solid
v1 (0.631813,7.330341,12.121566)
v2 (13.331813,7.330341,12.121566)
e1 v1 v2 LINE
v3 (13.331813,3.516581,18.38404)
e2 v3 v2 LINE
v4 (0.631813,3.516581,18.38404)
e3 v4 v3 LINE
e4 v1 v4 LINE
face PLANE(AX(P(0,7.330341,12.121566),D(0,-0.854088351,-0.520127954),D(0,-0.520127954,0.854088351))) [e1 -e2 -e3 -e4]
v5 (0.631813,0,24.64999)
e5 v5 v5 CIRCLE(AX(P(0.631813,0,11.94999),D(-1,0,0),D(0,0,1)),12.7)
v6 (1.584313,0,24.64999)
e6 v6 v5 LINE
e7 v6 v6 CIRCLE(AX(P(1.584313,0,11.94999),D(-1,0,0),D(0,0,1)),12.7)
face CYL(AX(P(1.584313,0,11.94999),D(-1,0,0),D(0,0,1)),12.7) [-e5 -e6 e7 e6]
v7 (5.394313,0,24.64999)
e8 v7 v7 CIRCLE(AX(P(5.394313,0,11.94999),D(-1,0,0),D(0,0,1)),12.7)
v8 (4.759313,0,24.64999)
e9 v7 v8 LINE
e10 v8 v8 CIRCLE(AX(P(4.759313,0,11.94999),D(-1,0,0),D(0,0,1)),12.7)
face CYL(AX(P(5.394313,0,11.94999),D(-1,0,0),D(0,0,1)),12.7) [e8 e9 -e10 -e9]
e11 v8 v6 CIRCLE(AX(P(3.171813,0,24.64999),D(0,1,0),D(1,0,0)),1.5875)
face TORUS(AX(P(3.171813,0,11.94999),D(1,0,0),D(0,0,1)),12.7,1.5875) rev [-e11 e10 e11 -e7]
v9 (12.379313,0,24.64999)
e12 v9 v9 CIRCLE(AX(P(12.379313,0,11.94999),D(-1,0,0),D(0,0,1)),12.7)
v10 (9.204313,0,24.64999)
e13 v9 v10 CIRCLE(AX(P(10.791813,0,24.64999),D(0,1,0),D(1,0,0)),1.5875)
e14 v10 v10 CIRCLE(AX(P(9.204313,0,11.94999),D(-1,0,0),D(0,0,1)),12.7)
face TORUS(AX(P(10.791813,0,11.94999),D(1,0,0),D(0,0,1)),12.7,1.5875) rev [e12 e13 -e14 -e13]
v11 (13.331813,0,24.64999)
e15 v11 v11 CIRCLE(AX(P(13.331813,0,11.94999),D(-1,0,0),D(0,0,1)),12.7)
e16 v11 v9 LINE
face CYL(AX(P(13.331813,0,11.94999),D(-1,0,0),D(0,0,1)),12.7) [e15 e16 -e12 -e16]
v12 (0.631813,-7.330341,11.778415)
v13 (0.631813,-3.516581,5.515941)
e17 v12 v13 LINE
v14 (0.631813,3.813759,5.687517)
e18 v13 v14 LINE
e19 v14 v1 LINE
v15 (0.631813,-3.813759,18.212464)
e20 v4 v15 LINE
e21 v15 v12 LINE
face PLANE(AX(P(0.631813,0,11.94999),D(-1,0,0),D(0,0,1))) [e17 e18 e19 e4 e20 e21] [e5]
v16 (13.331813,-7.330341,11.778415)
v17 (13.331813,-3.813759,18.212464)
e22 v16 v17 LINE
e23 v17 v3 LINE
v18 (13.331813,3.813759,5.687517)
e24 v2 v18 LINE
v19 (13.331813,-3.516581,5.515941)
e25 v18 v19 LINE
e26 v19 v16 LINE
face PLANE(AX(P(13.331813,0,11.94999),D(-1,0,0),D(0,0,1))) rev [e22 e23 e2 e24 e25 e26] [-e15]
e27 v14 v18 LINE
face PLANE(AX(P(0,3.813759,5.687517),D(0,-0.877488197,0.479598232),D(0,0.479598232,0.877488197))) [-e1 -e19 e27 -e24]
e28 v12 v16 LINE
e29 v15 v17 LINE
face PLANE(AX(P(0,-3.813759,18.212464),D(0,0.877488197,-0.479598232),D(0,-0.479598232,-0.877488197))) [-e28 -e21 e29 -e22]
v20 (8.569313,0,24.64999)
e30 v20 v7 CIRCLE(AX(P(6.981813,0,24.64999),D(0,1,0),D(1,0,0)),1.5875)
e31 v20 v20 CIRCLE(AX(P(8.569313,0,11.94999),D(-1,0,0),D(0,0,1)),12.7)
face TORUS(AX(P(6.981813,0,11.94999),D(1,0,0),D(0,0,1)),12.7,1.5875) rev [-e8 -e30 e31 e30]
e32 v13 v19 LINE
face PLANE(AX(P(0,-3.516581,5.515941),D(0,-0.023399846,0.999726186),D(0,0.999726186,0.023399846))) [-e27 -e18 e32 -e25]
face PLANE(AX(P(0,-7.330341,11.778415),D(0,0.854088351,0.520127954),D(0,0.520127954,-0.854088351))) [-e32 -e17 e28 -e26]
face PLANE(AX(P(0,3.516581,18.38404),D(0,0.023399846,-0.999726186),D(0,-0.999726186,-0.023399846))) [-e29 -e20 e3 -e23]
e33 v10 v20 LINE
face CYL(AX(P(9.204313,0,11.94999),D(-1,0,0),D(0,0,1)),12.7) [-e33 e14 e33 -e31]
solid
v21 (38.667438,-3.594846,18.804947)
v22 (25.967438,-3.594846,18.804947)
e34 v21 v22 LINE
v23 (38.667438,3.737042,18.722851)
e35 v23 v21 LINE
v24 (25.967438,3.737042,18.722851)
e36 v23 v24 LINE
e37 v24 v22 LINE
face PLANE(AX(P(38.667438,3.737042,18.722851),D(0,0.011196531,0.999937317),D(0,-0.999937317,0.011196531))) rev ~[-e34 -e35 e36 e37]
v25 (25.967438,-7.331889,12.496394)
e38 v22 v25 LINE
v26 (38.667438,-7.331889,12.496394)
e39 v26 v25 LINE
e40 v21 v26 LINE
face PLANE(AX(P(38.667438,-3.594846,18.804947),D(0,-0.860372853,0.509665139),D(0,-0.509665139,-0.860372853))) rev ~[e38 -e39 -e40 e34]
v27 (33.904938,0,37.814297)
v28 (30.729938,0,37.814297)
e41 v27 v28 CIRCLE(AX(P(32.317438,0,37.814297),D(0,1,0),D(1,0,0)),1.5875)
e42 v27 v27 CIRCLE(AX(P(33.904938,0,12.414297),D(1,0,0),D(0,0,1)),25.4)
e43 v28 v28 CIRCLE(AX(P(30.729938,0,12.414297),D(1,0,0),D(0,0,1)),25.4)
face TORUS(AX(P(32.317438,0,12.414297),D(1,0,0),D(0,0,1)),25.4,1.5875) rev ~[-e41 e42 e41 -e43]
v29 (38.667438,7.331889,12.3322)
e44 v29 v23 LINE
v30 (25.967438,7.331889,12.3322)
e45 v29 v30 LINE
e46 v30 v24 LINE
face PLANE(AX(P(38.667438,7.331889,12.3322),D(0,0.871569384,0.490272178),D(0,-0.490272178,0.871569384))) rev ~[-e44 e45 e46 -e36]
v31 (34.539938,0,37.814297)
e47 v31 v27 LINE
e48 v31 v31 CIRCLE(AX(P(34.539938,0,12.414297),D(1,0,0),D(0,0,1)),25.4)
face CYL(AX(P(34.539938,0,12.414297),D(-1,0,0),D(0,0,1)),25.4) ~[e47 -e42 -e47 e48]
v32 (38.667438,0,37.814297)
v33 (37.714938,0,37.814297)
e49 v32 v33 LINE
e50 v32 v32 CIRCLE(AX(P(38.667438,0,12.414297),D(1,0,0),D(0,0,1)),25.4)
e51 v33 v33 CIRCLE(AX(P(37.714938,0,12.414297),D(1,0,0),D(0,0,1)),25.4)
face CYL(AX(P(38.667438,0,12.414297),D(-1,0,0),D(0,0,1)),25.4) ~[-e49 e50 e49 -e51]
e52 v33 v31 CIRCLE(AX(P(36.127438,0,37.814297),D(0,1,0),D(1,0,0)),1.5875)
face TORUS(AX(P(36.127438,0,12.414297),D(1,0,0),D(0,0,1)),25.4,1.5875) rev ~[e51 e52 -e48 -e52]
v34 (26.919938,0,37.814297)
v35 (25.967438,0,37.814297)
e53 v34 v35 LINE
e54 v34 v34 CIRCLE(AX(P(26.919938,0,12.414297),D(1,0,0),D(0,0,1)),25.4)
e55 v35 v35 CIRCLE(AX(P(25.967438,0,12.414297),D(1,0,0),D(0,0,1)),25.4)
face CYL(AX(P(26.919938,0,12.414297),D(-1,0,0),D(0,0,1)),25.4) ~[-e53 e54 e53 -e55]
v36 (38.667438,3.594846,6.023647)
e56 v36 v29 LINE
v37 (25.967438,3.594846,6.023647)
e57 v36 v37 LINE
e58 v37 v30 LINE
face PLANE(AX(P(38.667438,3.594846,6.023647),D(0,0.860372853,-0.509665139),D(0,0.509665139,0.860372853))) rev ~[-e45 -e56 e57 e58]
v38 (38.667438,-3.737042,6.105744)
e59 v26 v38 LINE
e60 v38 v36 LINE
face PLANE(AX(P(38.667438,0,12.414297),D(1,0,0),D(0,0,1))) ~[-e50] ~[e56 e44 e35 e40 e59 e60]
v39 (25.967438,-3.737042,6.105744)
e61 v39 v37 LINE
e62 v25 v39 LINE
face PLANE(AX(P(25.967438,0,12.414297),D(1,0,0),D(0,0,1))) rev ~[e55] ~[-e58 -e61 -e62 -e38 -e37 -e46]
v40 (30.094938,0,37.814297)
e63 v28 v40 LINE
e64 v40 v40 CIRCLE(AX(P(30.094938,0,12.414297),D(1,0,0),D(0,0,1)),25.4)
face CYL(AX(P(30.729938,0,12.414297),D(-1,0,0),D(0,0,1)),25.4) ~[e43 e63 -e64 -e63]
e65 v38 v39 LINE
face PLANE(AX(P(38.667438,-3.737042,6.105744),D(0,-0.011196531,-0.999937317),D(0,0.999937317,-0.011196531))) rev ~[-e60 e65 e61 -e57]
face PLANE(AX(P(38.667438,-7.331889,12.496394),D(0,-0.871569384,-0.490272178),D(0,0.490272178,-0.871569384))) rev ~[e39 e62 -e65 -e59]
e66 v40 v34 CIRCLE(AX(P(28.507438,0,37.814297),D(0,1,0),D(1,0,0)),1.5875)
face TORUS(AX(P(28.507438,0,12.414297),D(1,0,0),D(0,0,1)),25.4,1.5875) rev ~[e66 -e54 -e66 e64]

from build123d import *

# Parameters (mm, degrees)
F3_DEPTH = 13.3328129599
F7_DEPTH = 25.4


with BuildPart() as f1:
    # F0 (on Front) → F1 (revolve)
    with BuildSketch(Plane.XZ):
        with BuildLine():
            ThreePointArc((4.7593129599, 24.6499903677), (3.1718129599, 23.0624903677), (1.5843129599, 24.6499903677))
            Line((1.5843129599, 24.6499903677), (0.6318129599, 24.6499903677))
            Line((0.6318129599, 24.6499903677), (0.6318129599, 11.9499903677))
            Line((0.6318129599, 11.9499903677), (13.3318129599, 11.9499903677))
            Line((13.3318129599, 11.9499903677), (13.3318129599, 24.6499903677))
            Line((13.3318129599, 24.6499903677), (12.3793129599, 24.6499903677))
            ThreePointArc((12.3793129599, 24.6499903677), (10.7918129599, 23.0624903677), (9.2043129599, 24.6499903677))
            Line((9.2043129599, 24.6499903677), (8.5693129599, 24.6499903677))
            ThreePointArc((8.5693129599, 24.6499903677), (6.9818129599, 23.0624903677), (5.3943129599, 24.6499903677))
            Line((5.3943129599, 24.6499903677), (4.7593129599, 24.6499903677))
        make_face()
    revolve(axis=Axis((6.9818129599, 0, 11.9499903677), (-1, 0, 0)))

    # F2 (on Right) → F3 (cut, through all)
    with BuildSketch(Plane.YZ):
        Polygon((3.8137593804, 5.6875169967), (7.33034072, 12.1215661895), (3.5165813396, 18.3840395605), (-3.8137593804, 18.2124637387), (-7.33034072, 11.7784145458), (-3.5165813396, 5.5159411749), align=None)
    extrude(amount=F3_DEPTH, mode=Mode.SUBTRACT)


with BuildPart() as f5:
    # F4 (on Front) → F5 (revolve)
    with BuildSketch(Plane.XZ):
        with BuildLine():
            ThreePointArc((30.0949377739, 37.814297089), (28.5074377739, 36.226797089), (26.9199377739, 37.814297089))
            Line((26.9199377739, 37.814297089), (25.9674377739, 37.814297089))
            Line((25.9674377739, 37.814297089), (25.9674377739, 12.414297089))
            Line((25.9674377739, 12.414297089), (38.6674377739, 12.414297089))
            Line((38.6674377739, 12.414297089), (38.6674377739, 37.814297089))
            Line((38.6674377739, 37.814297089), (37.7149377739, 37.814297089))
            ThreePointArc((37.7149377739, 37.814297089), (36.1274377739, 36.226797089), (34.5399377739, 37.814297089))
            Line((34.5399377739, 37.814297089), (33.9049377739, 37.814297089))
            ThreePointArc((33.9049377739, 37.814297089), (32.3174377739, 36.226797089), (30.7299377739, 37.814297089))
            Line((30.7299377739, 37.814297089), (30.0949377739, 37.814297089))
        make_face()
    revolve(axis=Axis((32.3174377739, 0, 12.414297089), (1, 0, 0)))

    # F6 (on face) → F7 (cut)
    with BuildSketch(Plane.YZ.offset(38.6674377739)):
        Polygon((7.3318888043, 12.3322002234), (3.7370423733, 18.7228506184), (-3.5948464309, 18.804947484), (-7.3318888043, 12.4963939546), (-3.7370423733, 6.1057435596), (3.5948464309, 6.023646694), align=None)
    extrude(amount=-F7_DEPTH, mode=Mode.SUBTRACT)


solid = Compound([f1.part, f5.part])
